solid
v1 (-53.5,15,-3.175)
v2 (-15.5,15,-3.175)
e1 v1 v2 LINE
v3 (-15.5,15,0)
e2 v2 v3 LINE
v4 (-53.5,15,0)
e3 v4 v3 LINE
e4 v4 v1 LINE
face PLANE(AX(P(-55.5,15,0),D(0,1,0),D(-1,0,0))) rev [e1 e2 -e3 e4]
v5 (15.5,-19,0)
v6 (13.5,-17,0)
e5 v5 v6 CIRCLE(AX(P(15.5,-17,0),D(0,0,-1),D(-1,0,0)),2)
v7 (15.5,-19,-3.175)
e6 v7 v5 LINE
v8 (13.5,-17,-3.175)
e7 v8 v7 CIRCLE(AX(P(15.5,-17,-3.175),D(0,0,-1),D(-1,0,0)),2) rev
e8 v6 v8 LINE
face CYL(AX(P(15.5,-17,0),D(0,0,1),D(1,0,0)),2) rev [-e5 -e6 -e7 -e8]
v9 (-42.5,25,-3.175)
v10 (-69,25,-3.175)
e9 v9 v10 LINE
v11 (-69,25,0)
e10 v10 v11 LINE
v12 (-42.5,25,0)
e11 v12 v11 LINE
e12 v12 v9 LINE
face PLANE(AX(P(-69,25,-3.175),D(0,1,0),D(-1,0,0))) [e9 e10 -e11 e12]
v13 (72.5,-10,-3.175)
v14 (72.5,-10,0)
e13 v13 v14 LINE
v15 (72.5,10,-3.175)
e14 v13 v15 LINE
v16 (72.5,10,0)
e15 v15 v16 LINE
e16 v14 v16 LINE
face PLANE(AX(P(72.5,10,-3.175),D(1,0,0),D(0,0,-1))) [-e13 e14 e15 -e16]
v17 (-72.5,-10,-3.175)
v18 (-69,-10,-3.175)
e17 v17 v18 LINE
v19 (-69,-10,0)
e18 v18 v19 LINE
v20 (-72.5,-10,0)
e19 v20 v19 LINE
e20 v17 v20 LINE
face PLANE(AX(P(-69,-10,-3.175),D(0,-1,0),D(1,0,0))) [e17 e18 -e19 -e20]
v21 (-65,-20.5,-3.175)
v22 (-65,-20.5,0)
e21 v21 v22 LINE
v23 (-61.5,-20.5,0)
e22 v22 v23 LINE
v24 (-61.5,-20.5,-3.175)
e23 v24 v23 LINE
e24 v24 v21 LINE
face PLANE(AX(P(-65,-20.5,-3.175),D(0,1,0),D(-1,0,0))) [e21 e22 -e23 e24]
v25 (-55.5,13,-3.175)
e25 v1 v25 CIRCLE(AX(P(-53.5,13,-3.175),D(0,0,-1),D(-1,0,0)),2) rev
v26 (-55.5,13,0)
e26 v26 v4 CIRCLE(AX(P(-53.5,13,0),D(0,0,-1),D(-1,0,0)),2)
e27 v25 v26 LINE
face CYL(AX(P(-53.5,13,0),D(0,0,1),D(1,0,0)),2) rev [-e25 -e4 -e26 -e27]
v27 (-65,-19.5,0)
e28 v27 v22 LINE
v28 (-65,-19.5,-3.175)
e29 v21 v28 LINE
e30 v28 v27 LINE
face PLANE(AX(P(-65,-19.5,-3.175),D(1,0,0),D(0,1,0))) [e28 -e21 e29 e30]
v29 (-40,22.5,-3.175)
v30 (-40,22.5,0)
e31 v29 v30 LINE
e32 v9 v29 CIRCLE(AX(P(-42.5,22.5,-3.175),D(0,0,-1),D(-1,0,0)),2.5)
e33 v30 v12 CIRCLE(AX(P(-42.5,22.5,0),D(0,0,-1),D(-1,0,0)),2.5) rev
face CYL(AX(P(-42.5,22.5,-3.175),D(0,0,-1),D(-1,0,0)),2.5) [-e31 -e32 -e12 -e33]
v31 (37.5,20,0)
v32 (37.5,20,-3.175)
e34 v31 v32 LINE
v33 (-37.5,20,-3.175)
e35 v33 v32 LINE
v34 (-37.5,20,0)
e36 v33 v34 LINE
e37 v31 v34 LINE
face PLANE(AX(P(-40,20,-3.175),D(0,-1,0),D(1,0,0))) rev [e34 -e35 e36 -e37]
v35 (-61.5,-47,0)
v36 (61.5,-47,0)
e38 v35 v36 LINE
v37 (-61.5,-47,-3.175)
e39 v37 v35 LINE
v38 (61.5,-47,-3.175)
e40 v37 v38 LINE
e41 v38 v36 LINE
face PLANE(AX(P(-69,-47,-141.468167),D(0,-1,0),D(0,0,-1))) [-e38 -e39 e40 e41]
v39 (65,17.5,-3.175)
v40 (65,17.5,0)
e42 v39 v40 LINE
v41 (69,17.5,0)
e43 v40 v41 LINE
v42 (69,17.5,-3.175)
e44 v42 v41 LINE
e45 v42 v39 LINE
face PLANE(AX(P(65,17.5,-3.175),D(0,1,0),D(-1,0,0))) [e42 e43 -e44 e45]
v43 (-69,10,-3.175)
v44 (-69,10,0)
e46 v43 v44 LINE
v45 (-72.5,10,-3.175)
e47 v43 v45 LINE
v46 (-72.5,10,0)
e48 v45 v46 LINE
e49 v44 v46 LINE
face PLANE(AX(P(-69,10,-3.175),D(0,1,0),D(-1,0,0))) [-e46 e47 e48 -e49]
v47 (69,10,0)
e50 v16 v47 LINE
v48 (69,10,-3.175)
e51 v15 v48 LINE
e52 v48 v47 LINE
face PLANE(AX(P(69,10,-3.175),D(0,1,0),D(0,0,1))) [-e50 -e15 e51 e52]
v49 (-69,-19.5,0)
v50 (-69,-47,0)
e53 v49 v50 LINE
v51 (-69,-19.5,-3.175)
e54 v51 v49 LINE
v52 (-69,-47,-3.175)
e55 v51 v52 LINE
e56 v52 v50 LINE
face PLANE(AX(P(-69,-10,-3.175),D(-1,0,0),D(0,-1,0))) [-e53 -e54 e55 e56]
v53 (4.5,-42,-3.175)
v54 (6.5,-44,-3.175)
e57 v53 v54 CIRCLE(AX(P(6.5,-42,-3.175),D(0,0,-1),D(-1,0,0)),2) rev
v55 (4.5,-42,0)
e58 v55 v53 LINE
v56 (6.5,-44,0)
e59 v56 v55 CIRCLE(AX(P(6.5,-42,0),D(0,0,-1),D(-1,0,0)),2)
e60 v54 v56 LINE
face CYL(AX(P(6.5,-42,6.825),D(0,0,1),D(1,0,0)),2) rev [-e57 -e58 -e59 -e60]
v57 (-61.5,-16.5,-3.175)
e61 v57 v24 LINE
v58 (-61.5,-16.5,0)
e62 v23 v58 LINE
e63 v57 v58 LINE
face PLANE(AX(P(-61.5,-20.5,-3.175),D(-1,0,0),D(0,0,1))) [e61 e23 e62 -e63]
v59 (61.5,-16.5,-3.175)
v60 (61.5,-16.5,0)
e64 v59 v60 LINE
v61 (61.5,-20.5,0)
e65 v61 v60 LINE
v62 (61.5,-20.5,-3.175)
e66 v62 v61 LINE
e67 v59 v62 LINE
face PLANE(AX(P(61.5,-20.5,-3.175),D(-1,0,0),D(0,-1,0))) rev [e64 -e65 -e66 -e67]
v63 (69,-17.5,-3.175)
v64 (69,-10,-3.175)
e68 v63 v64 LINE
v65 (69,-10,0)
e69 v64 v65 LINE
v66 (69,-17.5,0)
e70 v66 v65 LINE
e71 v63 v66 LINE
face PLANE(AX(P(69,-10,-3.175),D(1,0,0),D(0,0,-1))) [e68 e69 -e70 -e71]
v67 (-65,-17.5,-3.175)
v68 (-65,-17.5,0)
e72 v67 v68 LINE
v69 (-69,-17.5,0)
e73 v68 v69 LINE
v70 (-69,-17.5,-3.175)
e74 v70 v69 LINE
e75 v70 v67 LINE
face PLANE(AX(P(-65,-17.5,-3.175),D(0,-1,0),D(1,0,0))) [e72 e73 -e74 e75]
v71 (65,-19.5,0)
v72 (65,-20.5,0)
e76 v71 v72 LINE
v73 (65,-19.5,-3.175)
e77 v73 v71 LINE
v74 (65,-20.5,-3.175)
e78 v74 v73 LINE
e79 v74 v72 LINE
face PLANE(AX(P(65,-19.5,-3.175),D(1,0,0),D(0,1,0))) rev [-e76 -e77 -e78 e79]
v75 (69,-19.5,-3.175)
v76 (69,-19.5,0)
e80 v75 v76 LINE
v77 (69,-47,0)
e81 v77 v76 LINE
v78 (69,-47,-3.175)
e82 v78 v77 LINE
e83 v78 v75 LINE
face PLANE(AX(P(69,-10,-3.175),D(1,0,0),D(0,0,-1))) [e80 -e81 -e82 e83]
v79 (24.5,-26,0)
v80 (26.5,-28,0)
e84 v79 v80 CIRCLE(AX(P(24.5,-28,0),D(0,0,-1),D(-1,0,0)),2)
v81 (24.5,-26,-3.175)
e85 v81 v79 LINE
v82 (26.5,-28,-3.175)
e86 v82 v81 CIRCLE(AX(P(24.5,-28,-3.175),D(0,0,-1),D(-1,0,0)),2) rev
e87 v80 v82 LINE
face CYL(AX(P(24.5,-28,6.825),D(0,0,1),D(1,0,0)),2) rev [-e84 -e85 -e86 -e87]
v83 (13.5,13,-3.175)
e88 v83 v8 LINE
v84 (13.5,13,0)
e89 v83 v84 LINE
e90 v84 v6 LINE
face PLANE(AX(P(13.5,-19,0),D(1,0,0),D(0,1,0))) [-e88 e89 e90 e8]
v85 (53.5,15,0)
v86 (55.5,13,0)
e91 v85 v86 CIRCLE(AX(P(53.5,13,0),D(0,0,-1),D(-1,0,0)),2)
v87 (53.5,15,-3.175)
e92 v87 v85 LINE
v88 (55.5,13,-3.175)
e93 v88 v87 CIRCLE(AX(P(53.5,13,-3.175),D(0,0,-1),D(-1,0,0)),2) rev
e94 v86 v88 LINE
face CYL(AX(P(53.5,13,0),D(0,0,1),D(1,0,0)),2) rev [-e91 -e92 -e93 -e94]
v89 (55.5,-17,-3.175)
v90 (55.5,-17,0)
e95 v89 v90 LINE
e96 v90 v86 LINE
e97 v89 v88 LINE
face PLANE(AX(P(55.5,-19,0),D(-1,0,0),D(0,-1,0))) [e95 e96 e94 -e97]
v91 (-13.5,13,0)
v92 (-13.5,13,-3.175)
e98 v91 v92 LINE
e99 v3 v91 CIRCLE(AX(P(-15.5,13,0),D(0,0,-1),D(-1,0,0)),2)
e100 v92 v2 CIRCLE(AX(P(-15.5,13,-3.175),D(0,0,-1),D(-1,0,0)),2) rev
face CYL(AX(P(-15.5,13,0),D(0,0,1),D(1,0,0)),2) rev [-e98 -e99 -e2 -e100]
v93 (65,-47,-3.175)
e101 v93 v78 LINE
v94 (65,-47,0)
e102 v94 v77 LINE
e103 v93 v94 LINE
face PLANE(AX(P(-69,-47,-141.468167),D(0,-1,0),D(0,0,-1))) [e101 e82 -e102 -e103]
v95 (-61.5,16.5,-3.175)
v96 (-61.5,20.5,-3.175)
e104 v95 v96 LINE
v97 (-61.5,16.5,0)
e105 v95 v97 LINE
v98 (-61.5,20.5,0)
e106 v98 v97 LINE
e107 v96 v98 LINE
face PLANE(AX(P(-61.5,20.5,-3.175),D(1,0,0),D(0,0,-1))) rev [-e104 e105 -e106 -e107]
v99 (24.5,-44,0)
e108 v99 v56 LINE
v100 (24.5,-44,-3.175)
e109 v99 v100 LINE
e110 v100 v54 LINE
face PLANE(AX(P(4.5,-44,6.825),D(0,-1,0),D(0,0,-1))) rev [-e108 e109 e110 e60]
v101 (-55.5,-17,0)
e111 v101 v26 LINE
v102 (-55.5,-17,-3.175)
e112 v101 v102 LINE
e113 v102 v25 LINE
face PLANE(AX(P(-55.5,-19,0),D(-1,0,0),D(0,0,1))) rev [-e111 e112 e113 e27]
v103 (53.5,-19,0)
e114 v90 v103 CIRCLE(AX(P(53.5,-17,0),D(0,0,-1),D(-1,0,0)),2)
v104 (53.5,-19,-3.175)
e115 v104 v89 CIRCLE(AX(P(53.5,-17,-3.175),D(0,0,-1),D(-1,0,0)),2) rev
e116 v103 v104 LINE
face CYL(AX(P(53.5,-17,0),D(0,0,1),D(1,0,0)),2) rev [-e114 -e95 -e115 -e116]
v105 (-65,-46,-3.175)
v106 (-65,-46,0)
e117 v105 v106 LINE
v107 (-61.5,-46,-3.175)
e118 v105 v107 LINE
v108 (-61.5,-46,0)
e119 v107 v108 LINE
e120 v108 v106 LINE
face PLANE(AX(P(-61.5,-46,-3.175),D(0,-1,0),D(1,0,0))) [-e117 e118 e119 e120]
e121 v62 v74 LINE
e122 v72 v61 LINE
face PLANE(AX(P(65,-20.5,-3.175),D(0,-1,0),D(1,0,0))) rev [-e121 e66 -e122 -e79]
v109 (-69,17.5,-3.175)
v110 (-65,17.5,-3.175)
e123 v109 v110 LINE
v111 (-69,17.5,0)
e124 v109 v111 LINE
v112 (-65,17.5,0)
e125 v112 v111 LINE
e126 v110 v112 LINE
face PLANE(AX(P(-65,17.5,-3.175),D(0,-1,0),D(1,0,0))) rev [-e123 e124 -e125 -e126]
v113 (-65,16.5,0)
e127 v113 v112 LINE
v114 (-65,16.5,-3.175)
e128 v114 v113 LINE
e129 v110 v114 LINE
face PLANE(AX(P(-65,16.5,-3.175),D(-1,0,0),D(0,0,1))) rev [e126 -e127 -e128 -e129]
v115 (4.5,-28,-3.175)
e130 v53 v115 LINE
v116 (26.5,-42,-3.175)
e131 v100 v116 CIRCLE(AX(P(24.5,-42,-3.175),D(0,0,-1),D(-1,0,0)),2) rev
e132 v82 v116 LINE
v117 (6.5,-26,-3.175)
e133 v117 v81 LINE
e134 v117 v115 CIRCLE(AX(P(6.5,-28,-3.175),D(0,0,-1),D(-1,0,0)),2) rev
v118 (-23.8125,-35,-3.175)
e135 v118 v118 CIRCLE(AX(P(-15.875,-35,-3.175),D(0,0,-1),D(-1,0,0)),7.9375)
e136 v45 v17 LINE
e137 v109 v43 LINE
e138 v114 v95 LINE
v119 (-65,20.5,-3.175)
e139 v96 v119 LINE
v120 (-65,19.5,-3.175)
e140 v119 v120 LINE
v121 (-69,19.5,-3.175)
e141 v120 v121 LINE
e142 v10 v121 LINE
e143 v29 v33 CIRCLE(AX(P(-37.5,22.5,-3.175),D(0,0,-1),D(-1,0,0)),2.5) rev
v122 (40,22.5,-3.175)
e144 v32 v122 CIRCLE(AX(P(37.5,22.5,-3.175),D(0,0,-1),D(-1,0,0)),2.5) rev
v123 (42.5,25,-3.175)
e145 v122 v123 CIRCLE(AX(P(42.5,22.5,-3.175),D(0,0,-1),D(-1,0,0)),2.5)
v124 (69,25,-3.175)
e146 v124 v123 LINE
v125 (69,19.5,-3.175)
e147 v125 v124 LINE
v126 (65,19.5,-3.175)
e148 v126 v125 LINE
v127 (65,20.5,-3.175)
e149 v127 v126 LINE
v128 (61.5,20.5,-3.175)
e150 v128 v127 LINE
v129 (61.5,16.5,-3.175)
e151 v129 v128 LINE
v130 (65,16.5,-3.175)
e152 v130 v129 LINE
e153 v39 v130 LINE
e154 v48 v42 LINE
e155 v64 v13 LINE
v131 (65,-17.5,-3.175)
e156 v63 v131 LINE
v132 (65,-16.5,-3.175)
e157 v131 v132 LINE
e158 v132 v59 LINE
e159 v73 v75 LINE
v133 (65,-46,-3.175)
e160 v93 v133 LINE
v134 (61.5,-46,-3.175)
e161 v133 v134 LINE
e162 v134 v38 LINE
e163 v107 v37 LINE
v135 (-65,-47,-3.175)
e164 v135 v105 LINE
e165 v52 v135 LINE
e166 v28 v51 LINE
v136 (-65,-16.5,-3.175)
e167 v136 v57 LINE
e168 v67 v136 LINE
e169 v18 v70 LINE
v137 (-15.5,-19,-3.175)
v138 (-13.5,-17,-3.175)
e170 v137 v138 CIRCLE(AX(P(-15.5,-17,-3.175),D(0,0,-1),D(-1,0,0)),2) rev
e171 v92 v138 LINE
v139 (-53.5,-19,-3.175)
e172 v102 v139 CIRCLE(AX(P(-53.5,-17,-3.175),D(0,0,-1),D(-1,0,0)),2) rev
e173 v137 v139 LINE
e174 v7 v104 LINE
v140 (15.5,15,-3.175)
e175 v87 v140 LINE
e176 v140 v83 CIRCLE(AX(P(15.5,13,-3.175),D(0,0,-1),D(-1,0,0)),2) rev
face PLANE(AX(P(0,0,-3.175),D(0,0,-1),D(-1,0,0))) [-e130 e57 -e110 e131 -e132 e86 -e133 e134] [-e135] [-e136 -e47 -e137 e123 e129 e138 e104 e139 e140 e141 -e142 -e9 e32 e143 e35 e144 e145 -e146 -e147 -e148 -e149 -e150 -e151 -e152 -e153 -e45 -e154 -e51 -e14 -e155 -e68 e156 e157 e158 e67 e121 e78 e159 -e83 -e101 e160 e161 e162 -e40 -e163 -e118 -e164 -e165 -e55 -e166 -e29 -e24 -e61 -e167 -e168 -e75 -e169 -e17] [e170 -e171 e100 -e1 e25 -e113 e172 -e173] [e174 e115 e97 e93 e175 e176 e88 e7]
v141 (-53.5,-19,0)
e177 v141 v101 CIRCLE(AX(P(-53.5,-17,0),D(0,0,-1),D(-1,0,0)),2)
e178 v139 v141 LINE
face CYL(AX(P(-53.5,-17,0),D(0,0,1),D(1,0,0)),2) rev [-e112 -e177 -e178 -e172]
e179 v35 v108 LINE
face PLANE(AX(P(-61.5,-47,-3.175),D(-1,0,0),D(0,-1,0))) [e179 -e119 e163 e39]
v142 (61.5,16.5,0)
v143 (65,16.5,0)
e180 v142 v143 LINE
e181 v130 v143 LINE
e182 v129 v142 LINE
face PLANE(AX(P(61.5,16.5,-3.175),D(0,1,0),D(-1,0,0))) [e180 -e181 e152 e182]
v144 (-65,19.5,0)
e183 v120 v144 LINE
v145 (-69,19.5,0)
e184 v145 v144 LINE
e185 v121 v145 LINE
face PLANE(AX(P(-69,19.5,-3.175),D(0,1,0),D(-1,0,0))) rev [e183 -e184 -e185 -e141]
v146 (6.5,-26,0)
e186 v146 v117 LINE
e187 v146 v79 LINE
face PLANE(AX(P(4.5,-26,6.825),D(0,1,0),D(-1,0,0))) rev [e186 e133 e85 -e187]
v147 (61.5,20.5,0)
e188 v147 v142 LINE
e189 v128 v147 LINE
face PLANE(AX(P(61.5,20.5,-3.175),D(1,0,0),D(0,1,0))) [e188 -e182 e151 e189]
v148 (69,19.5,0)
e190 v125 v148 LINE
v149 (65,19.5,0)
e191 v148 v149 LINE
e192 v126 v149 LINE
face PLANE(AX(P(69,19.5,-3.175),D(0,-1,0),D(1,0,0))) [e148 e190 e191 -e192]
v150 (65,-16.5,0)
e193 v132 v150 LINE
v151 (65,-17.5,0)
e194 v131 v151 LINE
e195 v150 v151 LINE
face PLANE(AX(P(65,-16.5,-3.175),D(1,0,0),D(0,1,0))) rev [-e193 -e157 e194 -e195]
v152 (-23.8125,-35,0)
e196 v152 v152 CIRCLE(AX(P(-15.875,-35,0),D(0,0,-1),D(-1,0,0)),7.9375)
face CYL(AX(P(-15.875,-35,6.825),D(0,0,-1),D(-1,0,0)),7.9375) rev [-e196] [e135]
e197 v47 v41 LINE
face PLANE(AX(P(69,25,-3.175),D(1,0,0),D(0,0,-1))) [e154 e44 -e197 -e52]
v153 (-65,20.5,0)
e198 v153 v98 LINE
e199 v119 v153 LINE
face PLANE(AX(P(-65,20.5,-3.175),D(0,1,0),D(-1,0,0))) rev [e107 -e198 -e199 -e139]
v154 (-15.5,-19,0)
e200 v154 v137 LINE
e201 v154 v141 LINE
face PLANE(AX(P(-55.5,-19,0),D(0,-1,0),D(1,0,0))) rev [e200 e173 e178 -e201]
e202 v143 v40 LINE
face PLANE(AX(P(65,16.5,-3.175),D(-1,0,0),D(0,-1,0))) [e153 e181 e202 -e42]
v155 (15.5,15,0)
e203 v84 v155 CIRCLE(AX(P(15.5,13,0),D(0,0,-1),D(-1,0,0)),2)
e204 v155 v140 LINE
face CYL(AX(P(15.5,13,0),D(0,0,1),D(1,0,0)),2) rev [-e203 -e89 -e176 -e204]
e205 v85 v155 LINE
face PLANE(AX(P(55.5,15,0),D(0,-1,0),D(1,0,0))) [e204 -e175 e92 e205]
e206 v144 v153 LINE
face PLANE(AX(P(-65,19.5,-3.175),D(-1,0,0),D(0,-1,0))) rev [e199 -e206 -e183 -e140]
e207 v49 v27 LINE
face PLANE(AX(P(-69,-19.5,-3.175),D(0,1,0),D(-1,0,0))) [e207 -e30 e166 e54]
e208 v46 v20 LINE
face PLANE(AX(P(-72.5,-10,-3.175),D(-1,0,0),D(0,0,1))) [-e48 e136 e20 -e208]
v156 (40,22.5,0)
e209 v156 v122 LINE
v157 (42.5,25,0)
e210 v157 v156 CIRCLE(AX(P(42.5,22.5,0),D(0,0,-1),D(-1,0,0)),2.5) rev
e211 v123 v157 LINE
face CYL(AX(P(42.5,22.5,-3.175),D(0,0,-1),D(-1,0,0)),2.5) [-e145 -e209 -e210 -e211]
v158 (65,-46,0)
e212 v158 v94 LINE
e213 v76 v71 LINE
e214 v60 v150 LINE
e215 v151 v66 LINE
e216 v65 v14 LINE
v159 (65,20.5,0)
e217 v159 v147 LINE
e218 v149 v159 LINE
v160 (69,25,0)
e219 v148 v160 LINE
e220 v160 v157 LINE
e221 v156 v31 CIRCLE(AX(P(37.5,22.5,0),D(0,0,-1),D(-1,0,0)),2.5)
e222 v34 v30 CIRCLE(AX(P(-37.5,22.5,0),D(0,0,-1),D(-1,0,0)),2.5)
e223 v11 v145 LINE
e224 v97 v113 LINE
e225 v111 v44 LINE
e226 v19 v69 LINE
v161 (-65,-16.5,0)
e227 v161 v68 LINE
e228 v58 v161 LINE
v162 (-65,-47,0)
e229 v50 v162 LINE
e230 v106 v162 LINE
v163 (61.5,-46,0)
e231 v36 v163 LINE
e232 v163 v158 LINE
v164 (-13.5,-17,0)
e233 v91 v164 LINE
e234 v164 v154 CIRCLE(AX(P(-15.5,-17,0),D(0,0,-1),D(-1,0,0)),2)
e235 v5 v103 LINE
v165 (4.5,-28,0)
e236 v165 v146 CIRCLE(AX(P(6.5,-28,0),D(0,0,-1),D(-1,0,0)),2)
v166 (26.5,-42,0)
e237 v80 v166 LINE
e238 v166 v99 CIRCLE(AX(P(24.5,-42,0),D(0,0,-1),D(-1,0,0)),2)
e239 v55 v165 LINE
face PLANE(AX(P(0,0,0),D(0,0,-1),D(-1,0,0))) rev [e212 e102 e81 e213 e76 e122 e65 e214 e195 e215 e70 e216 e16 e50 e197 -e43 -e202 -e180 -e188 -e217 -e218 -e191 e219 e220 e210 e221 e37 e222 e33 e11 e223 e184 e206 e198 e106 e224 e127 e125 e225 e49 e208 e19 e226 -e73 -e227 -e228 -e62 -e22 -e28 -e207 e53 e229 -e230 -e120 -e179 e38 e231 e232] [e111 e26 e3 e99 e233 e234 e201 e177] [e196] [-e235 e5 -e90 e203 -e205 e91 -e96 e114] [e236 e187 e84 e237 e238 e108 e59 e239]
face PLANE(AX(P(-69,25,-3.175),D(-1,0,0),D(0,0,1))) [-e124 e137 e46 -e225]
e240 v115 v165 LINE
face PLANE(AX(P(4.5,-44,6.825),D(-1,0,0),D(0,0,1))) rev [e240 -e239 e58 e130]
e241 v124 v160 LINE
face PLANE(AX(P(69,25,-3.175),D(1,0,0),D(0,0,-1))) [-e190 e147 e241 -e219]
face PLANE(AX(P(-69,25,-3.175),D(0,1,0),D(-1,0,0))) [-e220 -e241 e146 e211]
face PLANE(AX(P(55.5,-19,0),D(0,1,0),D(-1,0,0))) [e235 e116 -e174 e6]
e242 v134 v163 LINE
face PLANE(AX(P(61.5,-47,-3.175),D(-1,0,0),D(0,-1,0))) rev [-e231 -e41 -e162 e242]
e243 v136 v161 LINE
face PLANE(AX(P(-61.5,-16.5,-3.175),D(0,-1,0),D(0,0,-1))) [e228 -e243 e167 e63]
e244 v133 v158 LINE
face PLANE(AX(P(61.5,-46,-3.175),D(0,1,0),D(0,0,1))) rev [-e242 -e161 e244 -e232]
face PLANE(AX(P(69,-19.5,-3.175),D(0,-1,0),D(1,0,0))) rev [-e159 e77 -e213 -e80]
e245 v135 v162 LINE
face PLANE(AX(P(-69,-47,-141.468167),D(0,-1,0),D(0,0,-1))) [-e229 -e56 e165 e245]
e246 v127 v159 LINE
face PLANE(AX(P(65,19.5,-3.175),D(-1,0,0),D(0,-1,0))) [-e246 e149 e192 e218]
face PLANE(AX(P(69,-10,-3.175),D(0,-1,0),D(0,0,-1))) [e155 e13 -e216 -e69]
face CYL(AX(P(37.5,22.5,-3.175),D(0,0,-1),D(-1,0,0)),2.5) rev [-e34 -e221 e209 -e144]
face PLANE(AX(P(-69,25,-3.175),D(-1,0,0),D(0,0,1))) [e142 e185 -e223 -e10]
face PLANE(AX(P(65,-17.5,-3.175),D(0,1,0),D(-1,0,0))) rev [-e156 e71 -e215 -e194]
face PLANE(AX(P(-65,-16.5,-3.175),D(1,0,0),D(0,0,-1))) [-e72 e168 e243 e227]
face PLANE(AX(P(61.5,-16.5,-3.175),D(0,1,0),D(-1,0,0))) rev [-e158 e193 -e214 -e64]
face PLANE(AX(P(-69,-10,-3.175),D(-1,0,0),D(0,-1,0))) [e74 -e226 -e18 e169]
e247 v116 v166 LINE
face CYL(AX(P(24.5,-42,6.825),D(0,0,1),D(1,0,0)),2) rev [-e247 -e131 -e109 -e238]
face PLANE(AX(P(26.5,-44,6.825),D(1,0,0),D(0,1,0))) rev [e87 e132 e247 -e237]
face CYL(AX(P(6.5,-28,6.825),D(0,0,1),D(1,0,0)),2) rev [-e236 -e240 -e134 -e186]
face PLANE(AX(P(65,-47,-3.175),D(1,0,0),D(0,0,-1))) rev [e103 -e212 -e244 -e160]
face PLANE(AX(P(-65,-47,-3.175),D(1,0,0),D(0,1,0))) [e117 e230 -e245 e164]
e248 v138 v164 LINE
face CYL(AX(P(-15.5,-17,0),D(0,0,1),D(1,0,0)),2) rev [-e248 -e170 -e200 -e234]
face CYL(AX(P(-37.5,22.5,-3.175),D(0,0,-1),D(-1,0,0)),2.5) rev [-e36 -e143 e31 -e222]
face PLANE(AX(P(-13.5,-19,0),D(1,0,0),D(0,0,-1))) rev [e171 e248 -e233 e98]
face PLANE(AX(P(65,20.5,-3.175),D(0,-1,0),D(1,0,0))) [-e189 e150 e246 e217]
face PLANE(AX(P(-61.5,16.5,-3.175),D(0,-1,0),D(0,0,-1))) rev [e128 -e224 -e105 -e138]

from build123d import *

# Parameters (mm, degrees)
BOSS_EXTRUDE1_DEPTH     = 3.175
CUT_EXTRUDE1_DEPTH      = 82.916607748
MIRROR2_COPY_1_DEPTH    = 82.916607748
SKETCH4_W               = 138
SKETCH4_H               = 9
BOSS_EXTRUDE3_DEPTH     = 3.175
CUT_EXTRUDE2_DEPTH      = 87.459994362
CUT_EXTRUDE2_DEPTH_BACK = 87.459994362
SKETCH5_W               = 80
SKETCH5_H               = 5
FILLET1_R               = 2.5
SKETCH6_W               = 3.5
SKETCH6_H               = 1
CUT_EXTRUDE3_DEPTH      = 87.459994362
SKETCH10_W              = 42
SKETCH10_H              = 34
CUT_EXTRUDE4_DEPTH      = 87.459994362
FILLET2_R               = 2
FILLET2_OF_MIRROR4_R    = 2
SKETCH11_R              = 7.9375
CUT_EXTRUDE5_DEPTH      = 10
SKETCH12_W              = 22
SKETCH12_H              = 18
CUT_EXTRUDE6_DEPTH      = 10
FILLET3_R               = 2


with BuildPart() as part:
    # Sketch1 → Boss-Extrude1 (new body)
    with BuildSketch(Plane.XY):
        Polygon((-69, -10), (-69, -38), (69, -38), (69, -10), (72.5, -10), (72.5, 10), (69, 10), (69, 25), (-69, 25), (-69, 10), (-72.5, 10), (-72.5, -10), align=None)
    extrude(amount=-BOSS_EXTRUDE1_DEPTH)

    # Sketch2 → Cut-Extrude1 (cut, symmetric)
    with BuildSketch(Plane.XY):
        Polygon((-69, 19.5), (-65, 19.5), (-65, 20.5), (-61.5, 20.5), (-61.5, 16.5), (-65, 16.5), (-65, 17.5), (-69, 17.5), align=None)
    cut_extrude1 = extrude(amount=CUT_EXTRUDE1_DEPTH, both=True, mode=Mode.SUBTRACT)

    # Mirror1: Cut-Extrude1 across plane
    add(cut_extrude1.mirror(Plane.ZY), mode=Mode.SUBTRACT)

    # Mirror2: Cut-Extrude1 across plane
    add(cut_extrude1.mirror(Plane.ZX), mode=Mode.SUBTRACT)

    # Mirror2 copy 1 sketch → Mirror2 copy 1 (cut, symmetric)
    with BuildSketch(Plane(origin=(0, 0, 0), x_dir=(-1, 0, 0), z_dir=(0, 0, 1))):
        Polygon((-69, 19.5), (-65, 19.5), (-65, 20.5), (-61.5, 20.5), (-61.5, 16.5), (-65, 16.5), (-65, 17.5), (-69, 17.5), align=None)
    extrude(amount=MIRROR2_COPY_1_DEPTH, both=True, mode=Mode.SUBTRACT)

    # Sketch4 → Boss-Extrude3 (add)
    with BuildSketch(Plane.XY):
        with Locations((0, -42.5)):
            Rectangle(SKETCH4_W, SKETCH4_H)
    extrude(amount=-BOSS_EXTRUDE3_DEPTH)

    # Sketch5 → Cut-Extrude2 (cut, two sides: drawn at the far end of the back side and taken through both)
    with BuildSketch(Plane.XY.offset(-CUT_EXTRUDE2_DEPTH_BACK)):
        with Locations((0, 22.5)):
            Rectangle(SKETCH5_W, SKETCH5_H)
    extrude(amount=CUT_EXTRUDE2_DEPTH + CUT_EXTRUDE2_DEPTH_BACK, mode=Mode.SUBTRACT)

    # Fillet1
    fillet1_edges = [part.edges().sort_by_distance(p)[0] for p in [
        (40, 20, -1.5875),
        (-40, 20, -1.5875),
    ]]
    fillet(fillet1_edges, radius=FILLET1_R)
    fillet1_2_edges = [part.edges().sort_by_distance(p)[0] for p in [
        (40, 25, -1.5875),
        (-40, 25, -1.5875),
    ]]
    fillet(fillet1_2_edges, radius=FILLET1_R - 0.0001)  # a hair under: the kernel refuses the full size

    # Sketch6 → Cut-Extrude3 (cut, symmetric)
    with BuildSketch(Plane.XY):
        with Locations((63.25, -46.5)):
            Rectangle(SKETCH6_W, SKETCH6_H)
    cut_extrude3 = extrude(amount=CUT_EXTRUDE3_DEPTH, both=True, mode=Mode.SUBTRACT)

    # Mirror3: Cut-Extrude3 across plane
    add(cut_extrude3.mirror(Plane.ZY), mode=Mode.SUBTRACT)

    # Sketch10 → Cut-Extrude4 (cut, through all)
    with BuildSketch(Plane(origin=(0, 0, -3.175), x_dir=(-1, 0, 0), z_dir=(0, 0, -1))):
        with Locations((34.5, -2)):
            Rectangle(SKETCH10_W, SKETCH10_H)
    cut_extrude4 = extrude(amount=-CUT_EXTRUDE4_DEPTH, mode=Mode.SUBTRACT)

    # Fillet2
    fillet2_edges = [part.edges().sort_by_distance(p)[0] for p in [
        (-55.5, 15, -1.5875),
        (-55.5, -19, -1.5875),
        (-13.5, -19, -1.5875),
        (-13.5, 15, -1.5875),
    ]]
    fillet(fillet2_edges, radius=FILLET2_R)

    # Mirror4: Cut-Extrude4 across plane
    add(cut_extrude4.mirror(Plane.ZY), mode=Mode.SUBTRACT)

    # Fillet2 of Mirror4
    fillet2_of_mirror4_edges = [part.edges().sort_by_distance(p)[0] for p in [
        (55.5, 15, -1.5875),
        (55.5, -19, -1.5875),
        (13.5, -19, -1.5875),
        (13.5, 15, -1.5875),
    ]]
    fillet(fillet2_of_mirror4_edges, radius=FILLET2_OF_MIRROR4_R)

    # Sketch11 → Cut-Extrude5 (cut)
    with BuildSketch(Plane(origin=(0, 0, -3.175), x_dir=(-1, 0, 0), z_dir=(0, 0, -1))):
        with Locations((15.875, -35)):
            Circle(SKETCH11_R)
    extrude(amount=-CUT_EXTRUDE5_DEPTH, mode=Mode.SUBTRACT)

    # Sketch12 → Cut-Extrude6 (cut)
    with BuildSketch(Plane(origin=(0, 0, -3.175), x_dir=(-1, 0, 0), z_dir=(0, 0, -1))):
        with Locations((-15.5, -35)):
            Rectangle(SKETCH12_W, SKETCH12_H)
    extrude(amount=-CUT_EXTRUDE6_DEPTH, mode=Mode.SUBTRACT)

    # Fillet3
    fillet3_edges = [part.edges().sort_by_distance(p)[0] for p in [
        (4.5, -26, -1.5875),
        (4.5, -44, -1.5875),
        (26.5, -44, -1.5875),
        (26.5, -26, -1.5875),
    ]]
    fillet(fillet3_edges, radius=FILLET3_R)


solid = part.part
